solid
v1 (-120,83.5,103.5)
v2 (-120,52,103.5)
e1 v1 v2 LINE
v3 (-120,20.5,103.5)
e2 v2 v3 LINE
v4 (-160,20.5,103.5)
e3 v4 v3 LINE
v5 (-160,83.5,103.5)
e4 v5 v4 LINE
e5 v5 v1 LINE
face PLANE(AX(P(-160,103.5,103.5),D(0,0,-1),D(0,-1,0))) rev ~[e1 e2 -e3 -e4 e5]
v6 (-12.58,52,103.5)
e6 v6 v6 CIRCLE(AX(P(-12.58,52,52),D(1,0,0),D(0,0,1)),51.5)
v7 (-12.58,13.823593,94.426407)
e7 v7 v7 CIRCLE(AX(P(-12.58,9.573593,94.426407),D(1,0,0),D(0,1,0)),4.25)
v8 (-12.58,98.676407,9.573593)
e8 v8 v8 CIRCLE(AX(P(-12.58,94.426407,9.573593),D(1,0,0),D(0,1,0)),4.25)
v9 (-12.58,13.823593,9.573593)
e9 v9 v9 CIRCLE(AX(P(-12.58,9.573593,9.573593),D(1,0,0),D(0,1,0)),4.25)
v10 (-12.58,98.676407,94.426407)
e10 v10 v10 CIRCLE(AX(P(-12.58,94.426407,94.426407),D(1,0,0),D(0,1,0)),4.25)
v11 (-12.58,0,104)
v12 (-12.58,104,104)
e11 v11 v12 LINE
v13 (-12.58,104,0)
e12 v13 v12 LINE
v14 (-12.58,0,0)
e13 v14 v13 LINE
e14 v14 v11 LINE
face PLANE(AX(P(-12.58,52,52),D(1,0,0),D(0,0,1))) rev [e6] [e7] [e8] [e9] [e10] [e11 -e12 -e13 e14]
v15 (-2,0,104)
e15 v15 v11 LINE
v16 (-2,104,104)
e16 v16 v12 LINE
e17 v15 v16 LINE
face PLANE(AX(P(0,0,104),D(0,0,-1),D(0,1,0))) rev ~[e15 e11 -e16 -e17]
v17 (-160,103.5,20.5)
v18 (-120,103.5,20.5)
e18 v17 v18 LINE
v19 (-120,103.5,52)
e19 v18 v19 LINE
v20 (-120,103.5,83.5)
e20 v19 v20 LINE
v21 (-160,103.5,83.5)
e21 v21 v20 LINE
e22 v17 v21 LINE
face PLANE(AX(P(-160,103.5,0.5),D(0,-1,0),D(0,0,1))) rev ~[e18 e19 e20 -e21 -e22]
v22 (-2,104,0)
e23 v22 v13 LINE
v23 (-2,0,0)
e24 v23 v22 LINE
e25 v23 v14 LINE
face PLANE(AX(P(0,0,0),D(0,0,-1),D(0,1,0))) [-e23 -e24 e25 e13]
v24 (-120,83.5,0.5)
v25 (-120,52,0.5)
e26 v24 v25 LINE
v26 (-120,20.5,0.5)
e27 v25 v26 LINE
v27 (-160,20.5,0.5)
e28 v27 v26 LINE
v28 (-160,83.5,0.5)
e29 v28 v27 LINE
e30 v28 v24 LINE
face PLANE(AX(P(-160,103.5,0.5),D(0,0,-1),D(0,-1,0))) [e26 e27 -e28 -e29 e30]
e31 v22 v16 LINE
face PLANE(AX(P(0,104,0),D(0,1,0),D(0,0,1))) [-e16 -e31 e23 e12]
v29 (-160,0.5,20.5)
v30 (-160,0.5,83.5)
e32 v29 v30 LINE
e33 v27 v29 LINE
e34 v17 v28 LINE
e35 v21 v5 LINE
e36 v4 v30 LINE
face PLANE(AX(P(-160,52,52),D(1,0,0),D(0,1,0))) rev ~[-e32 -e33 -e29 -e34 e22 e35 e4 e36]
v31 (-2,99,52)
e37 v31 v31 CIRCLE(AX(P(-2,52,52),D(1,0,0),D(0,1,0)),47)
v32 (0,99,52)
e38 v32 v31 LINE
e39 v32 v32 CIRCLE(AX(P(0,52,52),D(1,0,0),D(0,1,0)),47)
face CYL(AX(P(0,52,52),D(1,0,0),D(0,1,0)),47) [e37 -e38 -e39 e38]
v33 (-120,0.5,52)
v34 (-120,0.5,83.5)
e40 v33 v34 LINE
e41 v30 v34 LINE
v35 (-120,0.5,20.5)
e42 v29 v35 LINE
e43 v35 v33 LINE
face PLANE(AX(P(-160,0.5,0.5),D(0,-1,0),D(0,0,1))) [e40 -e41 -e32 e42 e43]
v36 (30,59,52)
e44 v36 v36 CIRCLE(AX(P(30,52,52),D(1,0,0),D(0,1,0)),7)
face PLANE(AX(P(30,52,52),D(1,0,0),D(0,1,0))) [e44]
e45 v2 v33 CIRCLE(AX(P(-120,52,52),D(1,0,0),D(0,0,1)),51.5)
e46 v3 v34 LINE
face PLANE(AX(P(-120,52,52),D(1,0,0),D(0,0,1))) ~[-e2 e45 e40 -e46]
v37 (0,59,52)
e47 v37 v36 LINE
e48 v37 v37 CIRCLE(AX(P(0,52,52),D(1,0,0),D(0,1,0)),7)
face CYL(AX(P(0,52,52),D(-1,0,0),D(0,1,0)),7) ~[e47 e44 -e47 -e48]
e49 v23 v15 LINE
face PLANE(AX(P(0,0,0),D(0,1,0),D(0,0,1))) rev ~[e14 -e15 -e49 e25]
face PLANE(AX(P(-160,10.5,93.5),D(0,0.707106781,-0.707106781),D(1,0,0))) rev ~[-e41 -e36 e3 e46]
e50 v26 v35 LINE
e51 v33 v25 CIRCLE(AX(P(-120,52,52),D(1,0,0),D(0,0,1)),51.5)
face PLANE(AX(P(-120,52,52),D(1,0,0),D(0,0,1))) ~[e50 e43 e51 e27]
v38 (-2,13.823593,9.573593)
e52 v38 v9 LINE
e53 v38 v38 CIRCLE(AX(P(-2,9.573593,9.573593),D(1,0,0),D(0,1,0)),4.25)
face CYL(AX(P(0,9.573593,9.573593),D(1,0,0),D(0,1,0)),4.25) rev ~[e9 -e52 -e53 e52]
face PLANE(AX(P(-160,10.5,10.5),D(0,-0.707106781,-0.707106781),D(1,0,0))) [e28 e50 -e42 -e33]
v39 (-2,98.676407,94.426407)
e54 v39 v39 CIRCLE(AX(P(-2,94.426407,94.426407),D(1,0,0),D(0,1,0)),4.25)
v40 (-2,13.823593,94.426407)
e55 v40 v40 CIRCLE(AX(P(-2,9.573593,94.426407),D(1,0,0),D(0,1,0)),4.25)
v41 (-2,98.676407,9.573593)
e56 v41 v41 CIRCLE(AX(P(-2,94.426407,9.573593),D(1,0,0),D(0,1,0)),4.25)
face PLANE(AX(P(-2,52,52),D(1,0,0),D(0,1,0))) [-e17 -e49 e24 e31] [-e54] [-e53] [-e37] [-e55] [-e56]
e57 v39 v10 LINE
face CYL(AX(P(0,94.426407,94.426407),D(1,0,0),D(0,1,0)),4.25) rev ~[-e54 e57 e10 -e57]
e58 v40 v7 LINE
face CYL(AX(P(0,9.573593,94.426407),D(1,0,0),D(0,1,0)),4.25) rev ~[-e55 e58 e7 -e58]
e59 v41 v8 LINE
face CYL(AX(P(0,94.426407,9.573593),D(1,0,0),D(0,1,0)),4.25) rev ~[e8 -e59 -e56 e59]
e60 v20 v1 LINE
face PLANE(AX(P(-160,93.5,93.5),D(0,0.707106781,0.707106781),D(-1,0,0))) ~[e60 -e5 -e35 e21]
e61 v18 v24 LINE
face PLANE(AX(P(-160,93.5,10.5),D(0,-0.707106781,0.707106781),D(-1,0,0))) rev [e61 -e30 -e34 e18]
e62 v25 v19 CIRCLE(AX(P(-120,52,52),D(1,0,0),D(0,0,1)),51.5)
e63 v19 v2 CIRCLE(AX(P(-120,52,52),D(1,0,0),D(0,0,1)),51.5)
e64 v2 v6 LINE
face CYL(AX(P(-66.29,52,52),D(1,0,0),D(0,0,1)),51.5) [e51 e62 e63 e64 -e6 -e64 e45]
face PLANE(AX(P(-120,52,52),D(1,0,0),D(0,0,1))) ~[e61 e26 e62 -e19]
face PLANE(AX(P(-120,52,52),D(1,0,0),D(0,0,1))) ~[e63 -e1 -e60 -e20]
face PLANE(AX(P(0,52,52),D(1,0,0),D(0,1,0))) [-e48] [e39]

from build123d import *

# Parameters (mm, degrees)
F0_W      = 104
F0_H      = 104
F1_DEPTH  = 160
F3_W      = 107.42
F3_H      = 40
F5_W      = 104
F5_H      = 104
F5_W_2    = 103
F5_H_2    = 103
F6_DEPTH  = 40
F7_SIZE   = 20
F8_R      = 4.25
F9_DEPTH  = 25
F10_R     = 7
F11_DEPTH = 30
F12_W     = 104
F12_H     = 104
F12_R     = 4.25
F12_R_2   = 47
F13_DEPTH = 2


with BuildPart() as f1:
    # F0 (on Right) → F1 (new body)
    with BuildSketch(Plane.YZ):
        with Locations((52, 52)):
            Rectangle(F0_W, F0_H)
    extrude(amount=-F1_DEPTH)

    # F3 (on offset) → F4 (revolve, cut)
    with BuildSketch(Plane.XZ.offset(-52)):
        with Locations((-66.29, 123.5)):
            Rectangle(F3_W, F3_H)
    revolve(axis=Axis((-69.2846309394, 52, 52), (1, 0, 0)), mode=Mode.SUBTRACT)

    # F5 (on face) → F6 (cut)
    with BuildSketch(Plane(origin=(-160, 0, 0), x_dir=(0, -1, 0), z_dir=(-1, 0, 0))):
        with Locations((-52, 52)):
            Rectangle(F5_W, F5_H)
        with Locations((-52, 52)):
            Rectangle(F5_W_2, F5_H_2, mode=Mode.SUBTRACT)
    extrude(amount=-F6_DEPTH, mode=Mode.SUBTRACT)

    # F7
    f7_edges = [f1.edges().sort_by_distance(p)[0] for p in [
        (-140, 0.5, 103.5),
        (-140, 103.5, 103.5),
        (-140, 103.5, 0.5),
        (-140, 0.5, 0.5),
    ]]
    chamfer(f7_edges, length=F7_SIZE)

    # F8 (on face) → F9 (cut)
    with BuildSketch(Plane.YZ):
        with Locations((94.4264068712, 94.4264068712)):
            Circle(F8_R)
        with Locations((94.4264068712, 9.5735931288)):
            Circle(F8_R)
        with Locations((9.5735931288, 94.4264068712)):
            Circle(F8_R)
        with Locations((9.5735931288, 9.5735931288)):
            Circle(F8_R)
    extrude(amount=-F9_DEPTH, mode=Mode.SUBTRACT)

    # F10 (on face) → F11 (join)
    with BuildSketch(Plane.YZ):
        with Locations((52, 52)):
            Circle(F10_R)
    extrude(amount=F11_DEPTH)

    # F12 (on face) → F13 (cut)
    with BuildSketch(Plane.YZ):
        with Locations((52, 52)):
            Rectangle(F12_W, F12_H)
        with Locations((9.5735931288, 9.5735931288)):
            Circle(F12_R, mode=Mode.SUBTRACT)
        with Locations((94.4264068712, 9.5735931288)):
            Circle(F12_R, mode=Mode.SUBTRACT)
        with Locations((9.5735931288, 94.4264068712)):
            Circle(F12_R, mode=Mode.SUBTRACT)
        with Locations((52, 52)):
            Circle(F12_R_2, mode=Mode.SUBTRACT)
        with Locations((94.4264068712, 94.4264068712)):
            Circle(F12_R, mode=Mode.SUBTRACT)
    extrude(amount=-F13_DEPTH, mode=Mode.SUBTRACT)


solid = f1.part
